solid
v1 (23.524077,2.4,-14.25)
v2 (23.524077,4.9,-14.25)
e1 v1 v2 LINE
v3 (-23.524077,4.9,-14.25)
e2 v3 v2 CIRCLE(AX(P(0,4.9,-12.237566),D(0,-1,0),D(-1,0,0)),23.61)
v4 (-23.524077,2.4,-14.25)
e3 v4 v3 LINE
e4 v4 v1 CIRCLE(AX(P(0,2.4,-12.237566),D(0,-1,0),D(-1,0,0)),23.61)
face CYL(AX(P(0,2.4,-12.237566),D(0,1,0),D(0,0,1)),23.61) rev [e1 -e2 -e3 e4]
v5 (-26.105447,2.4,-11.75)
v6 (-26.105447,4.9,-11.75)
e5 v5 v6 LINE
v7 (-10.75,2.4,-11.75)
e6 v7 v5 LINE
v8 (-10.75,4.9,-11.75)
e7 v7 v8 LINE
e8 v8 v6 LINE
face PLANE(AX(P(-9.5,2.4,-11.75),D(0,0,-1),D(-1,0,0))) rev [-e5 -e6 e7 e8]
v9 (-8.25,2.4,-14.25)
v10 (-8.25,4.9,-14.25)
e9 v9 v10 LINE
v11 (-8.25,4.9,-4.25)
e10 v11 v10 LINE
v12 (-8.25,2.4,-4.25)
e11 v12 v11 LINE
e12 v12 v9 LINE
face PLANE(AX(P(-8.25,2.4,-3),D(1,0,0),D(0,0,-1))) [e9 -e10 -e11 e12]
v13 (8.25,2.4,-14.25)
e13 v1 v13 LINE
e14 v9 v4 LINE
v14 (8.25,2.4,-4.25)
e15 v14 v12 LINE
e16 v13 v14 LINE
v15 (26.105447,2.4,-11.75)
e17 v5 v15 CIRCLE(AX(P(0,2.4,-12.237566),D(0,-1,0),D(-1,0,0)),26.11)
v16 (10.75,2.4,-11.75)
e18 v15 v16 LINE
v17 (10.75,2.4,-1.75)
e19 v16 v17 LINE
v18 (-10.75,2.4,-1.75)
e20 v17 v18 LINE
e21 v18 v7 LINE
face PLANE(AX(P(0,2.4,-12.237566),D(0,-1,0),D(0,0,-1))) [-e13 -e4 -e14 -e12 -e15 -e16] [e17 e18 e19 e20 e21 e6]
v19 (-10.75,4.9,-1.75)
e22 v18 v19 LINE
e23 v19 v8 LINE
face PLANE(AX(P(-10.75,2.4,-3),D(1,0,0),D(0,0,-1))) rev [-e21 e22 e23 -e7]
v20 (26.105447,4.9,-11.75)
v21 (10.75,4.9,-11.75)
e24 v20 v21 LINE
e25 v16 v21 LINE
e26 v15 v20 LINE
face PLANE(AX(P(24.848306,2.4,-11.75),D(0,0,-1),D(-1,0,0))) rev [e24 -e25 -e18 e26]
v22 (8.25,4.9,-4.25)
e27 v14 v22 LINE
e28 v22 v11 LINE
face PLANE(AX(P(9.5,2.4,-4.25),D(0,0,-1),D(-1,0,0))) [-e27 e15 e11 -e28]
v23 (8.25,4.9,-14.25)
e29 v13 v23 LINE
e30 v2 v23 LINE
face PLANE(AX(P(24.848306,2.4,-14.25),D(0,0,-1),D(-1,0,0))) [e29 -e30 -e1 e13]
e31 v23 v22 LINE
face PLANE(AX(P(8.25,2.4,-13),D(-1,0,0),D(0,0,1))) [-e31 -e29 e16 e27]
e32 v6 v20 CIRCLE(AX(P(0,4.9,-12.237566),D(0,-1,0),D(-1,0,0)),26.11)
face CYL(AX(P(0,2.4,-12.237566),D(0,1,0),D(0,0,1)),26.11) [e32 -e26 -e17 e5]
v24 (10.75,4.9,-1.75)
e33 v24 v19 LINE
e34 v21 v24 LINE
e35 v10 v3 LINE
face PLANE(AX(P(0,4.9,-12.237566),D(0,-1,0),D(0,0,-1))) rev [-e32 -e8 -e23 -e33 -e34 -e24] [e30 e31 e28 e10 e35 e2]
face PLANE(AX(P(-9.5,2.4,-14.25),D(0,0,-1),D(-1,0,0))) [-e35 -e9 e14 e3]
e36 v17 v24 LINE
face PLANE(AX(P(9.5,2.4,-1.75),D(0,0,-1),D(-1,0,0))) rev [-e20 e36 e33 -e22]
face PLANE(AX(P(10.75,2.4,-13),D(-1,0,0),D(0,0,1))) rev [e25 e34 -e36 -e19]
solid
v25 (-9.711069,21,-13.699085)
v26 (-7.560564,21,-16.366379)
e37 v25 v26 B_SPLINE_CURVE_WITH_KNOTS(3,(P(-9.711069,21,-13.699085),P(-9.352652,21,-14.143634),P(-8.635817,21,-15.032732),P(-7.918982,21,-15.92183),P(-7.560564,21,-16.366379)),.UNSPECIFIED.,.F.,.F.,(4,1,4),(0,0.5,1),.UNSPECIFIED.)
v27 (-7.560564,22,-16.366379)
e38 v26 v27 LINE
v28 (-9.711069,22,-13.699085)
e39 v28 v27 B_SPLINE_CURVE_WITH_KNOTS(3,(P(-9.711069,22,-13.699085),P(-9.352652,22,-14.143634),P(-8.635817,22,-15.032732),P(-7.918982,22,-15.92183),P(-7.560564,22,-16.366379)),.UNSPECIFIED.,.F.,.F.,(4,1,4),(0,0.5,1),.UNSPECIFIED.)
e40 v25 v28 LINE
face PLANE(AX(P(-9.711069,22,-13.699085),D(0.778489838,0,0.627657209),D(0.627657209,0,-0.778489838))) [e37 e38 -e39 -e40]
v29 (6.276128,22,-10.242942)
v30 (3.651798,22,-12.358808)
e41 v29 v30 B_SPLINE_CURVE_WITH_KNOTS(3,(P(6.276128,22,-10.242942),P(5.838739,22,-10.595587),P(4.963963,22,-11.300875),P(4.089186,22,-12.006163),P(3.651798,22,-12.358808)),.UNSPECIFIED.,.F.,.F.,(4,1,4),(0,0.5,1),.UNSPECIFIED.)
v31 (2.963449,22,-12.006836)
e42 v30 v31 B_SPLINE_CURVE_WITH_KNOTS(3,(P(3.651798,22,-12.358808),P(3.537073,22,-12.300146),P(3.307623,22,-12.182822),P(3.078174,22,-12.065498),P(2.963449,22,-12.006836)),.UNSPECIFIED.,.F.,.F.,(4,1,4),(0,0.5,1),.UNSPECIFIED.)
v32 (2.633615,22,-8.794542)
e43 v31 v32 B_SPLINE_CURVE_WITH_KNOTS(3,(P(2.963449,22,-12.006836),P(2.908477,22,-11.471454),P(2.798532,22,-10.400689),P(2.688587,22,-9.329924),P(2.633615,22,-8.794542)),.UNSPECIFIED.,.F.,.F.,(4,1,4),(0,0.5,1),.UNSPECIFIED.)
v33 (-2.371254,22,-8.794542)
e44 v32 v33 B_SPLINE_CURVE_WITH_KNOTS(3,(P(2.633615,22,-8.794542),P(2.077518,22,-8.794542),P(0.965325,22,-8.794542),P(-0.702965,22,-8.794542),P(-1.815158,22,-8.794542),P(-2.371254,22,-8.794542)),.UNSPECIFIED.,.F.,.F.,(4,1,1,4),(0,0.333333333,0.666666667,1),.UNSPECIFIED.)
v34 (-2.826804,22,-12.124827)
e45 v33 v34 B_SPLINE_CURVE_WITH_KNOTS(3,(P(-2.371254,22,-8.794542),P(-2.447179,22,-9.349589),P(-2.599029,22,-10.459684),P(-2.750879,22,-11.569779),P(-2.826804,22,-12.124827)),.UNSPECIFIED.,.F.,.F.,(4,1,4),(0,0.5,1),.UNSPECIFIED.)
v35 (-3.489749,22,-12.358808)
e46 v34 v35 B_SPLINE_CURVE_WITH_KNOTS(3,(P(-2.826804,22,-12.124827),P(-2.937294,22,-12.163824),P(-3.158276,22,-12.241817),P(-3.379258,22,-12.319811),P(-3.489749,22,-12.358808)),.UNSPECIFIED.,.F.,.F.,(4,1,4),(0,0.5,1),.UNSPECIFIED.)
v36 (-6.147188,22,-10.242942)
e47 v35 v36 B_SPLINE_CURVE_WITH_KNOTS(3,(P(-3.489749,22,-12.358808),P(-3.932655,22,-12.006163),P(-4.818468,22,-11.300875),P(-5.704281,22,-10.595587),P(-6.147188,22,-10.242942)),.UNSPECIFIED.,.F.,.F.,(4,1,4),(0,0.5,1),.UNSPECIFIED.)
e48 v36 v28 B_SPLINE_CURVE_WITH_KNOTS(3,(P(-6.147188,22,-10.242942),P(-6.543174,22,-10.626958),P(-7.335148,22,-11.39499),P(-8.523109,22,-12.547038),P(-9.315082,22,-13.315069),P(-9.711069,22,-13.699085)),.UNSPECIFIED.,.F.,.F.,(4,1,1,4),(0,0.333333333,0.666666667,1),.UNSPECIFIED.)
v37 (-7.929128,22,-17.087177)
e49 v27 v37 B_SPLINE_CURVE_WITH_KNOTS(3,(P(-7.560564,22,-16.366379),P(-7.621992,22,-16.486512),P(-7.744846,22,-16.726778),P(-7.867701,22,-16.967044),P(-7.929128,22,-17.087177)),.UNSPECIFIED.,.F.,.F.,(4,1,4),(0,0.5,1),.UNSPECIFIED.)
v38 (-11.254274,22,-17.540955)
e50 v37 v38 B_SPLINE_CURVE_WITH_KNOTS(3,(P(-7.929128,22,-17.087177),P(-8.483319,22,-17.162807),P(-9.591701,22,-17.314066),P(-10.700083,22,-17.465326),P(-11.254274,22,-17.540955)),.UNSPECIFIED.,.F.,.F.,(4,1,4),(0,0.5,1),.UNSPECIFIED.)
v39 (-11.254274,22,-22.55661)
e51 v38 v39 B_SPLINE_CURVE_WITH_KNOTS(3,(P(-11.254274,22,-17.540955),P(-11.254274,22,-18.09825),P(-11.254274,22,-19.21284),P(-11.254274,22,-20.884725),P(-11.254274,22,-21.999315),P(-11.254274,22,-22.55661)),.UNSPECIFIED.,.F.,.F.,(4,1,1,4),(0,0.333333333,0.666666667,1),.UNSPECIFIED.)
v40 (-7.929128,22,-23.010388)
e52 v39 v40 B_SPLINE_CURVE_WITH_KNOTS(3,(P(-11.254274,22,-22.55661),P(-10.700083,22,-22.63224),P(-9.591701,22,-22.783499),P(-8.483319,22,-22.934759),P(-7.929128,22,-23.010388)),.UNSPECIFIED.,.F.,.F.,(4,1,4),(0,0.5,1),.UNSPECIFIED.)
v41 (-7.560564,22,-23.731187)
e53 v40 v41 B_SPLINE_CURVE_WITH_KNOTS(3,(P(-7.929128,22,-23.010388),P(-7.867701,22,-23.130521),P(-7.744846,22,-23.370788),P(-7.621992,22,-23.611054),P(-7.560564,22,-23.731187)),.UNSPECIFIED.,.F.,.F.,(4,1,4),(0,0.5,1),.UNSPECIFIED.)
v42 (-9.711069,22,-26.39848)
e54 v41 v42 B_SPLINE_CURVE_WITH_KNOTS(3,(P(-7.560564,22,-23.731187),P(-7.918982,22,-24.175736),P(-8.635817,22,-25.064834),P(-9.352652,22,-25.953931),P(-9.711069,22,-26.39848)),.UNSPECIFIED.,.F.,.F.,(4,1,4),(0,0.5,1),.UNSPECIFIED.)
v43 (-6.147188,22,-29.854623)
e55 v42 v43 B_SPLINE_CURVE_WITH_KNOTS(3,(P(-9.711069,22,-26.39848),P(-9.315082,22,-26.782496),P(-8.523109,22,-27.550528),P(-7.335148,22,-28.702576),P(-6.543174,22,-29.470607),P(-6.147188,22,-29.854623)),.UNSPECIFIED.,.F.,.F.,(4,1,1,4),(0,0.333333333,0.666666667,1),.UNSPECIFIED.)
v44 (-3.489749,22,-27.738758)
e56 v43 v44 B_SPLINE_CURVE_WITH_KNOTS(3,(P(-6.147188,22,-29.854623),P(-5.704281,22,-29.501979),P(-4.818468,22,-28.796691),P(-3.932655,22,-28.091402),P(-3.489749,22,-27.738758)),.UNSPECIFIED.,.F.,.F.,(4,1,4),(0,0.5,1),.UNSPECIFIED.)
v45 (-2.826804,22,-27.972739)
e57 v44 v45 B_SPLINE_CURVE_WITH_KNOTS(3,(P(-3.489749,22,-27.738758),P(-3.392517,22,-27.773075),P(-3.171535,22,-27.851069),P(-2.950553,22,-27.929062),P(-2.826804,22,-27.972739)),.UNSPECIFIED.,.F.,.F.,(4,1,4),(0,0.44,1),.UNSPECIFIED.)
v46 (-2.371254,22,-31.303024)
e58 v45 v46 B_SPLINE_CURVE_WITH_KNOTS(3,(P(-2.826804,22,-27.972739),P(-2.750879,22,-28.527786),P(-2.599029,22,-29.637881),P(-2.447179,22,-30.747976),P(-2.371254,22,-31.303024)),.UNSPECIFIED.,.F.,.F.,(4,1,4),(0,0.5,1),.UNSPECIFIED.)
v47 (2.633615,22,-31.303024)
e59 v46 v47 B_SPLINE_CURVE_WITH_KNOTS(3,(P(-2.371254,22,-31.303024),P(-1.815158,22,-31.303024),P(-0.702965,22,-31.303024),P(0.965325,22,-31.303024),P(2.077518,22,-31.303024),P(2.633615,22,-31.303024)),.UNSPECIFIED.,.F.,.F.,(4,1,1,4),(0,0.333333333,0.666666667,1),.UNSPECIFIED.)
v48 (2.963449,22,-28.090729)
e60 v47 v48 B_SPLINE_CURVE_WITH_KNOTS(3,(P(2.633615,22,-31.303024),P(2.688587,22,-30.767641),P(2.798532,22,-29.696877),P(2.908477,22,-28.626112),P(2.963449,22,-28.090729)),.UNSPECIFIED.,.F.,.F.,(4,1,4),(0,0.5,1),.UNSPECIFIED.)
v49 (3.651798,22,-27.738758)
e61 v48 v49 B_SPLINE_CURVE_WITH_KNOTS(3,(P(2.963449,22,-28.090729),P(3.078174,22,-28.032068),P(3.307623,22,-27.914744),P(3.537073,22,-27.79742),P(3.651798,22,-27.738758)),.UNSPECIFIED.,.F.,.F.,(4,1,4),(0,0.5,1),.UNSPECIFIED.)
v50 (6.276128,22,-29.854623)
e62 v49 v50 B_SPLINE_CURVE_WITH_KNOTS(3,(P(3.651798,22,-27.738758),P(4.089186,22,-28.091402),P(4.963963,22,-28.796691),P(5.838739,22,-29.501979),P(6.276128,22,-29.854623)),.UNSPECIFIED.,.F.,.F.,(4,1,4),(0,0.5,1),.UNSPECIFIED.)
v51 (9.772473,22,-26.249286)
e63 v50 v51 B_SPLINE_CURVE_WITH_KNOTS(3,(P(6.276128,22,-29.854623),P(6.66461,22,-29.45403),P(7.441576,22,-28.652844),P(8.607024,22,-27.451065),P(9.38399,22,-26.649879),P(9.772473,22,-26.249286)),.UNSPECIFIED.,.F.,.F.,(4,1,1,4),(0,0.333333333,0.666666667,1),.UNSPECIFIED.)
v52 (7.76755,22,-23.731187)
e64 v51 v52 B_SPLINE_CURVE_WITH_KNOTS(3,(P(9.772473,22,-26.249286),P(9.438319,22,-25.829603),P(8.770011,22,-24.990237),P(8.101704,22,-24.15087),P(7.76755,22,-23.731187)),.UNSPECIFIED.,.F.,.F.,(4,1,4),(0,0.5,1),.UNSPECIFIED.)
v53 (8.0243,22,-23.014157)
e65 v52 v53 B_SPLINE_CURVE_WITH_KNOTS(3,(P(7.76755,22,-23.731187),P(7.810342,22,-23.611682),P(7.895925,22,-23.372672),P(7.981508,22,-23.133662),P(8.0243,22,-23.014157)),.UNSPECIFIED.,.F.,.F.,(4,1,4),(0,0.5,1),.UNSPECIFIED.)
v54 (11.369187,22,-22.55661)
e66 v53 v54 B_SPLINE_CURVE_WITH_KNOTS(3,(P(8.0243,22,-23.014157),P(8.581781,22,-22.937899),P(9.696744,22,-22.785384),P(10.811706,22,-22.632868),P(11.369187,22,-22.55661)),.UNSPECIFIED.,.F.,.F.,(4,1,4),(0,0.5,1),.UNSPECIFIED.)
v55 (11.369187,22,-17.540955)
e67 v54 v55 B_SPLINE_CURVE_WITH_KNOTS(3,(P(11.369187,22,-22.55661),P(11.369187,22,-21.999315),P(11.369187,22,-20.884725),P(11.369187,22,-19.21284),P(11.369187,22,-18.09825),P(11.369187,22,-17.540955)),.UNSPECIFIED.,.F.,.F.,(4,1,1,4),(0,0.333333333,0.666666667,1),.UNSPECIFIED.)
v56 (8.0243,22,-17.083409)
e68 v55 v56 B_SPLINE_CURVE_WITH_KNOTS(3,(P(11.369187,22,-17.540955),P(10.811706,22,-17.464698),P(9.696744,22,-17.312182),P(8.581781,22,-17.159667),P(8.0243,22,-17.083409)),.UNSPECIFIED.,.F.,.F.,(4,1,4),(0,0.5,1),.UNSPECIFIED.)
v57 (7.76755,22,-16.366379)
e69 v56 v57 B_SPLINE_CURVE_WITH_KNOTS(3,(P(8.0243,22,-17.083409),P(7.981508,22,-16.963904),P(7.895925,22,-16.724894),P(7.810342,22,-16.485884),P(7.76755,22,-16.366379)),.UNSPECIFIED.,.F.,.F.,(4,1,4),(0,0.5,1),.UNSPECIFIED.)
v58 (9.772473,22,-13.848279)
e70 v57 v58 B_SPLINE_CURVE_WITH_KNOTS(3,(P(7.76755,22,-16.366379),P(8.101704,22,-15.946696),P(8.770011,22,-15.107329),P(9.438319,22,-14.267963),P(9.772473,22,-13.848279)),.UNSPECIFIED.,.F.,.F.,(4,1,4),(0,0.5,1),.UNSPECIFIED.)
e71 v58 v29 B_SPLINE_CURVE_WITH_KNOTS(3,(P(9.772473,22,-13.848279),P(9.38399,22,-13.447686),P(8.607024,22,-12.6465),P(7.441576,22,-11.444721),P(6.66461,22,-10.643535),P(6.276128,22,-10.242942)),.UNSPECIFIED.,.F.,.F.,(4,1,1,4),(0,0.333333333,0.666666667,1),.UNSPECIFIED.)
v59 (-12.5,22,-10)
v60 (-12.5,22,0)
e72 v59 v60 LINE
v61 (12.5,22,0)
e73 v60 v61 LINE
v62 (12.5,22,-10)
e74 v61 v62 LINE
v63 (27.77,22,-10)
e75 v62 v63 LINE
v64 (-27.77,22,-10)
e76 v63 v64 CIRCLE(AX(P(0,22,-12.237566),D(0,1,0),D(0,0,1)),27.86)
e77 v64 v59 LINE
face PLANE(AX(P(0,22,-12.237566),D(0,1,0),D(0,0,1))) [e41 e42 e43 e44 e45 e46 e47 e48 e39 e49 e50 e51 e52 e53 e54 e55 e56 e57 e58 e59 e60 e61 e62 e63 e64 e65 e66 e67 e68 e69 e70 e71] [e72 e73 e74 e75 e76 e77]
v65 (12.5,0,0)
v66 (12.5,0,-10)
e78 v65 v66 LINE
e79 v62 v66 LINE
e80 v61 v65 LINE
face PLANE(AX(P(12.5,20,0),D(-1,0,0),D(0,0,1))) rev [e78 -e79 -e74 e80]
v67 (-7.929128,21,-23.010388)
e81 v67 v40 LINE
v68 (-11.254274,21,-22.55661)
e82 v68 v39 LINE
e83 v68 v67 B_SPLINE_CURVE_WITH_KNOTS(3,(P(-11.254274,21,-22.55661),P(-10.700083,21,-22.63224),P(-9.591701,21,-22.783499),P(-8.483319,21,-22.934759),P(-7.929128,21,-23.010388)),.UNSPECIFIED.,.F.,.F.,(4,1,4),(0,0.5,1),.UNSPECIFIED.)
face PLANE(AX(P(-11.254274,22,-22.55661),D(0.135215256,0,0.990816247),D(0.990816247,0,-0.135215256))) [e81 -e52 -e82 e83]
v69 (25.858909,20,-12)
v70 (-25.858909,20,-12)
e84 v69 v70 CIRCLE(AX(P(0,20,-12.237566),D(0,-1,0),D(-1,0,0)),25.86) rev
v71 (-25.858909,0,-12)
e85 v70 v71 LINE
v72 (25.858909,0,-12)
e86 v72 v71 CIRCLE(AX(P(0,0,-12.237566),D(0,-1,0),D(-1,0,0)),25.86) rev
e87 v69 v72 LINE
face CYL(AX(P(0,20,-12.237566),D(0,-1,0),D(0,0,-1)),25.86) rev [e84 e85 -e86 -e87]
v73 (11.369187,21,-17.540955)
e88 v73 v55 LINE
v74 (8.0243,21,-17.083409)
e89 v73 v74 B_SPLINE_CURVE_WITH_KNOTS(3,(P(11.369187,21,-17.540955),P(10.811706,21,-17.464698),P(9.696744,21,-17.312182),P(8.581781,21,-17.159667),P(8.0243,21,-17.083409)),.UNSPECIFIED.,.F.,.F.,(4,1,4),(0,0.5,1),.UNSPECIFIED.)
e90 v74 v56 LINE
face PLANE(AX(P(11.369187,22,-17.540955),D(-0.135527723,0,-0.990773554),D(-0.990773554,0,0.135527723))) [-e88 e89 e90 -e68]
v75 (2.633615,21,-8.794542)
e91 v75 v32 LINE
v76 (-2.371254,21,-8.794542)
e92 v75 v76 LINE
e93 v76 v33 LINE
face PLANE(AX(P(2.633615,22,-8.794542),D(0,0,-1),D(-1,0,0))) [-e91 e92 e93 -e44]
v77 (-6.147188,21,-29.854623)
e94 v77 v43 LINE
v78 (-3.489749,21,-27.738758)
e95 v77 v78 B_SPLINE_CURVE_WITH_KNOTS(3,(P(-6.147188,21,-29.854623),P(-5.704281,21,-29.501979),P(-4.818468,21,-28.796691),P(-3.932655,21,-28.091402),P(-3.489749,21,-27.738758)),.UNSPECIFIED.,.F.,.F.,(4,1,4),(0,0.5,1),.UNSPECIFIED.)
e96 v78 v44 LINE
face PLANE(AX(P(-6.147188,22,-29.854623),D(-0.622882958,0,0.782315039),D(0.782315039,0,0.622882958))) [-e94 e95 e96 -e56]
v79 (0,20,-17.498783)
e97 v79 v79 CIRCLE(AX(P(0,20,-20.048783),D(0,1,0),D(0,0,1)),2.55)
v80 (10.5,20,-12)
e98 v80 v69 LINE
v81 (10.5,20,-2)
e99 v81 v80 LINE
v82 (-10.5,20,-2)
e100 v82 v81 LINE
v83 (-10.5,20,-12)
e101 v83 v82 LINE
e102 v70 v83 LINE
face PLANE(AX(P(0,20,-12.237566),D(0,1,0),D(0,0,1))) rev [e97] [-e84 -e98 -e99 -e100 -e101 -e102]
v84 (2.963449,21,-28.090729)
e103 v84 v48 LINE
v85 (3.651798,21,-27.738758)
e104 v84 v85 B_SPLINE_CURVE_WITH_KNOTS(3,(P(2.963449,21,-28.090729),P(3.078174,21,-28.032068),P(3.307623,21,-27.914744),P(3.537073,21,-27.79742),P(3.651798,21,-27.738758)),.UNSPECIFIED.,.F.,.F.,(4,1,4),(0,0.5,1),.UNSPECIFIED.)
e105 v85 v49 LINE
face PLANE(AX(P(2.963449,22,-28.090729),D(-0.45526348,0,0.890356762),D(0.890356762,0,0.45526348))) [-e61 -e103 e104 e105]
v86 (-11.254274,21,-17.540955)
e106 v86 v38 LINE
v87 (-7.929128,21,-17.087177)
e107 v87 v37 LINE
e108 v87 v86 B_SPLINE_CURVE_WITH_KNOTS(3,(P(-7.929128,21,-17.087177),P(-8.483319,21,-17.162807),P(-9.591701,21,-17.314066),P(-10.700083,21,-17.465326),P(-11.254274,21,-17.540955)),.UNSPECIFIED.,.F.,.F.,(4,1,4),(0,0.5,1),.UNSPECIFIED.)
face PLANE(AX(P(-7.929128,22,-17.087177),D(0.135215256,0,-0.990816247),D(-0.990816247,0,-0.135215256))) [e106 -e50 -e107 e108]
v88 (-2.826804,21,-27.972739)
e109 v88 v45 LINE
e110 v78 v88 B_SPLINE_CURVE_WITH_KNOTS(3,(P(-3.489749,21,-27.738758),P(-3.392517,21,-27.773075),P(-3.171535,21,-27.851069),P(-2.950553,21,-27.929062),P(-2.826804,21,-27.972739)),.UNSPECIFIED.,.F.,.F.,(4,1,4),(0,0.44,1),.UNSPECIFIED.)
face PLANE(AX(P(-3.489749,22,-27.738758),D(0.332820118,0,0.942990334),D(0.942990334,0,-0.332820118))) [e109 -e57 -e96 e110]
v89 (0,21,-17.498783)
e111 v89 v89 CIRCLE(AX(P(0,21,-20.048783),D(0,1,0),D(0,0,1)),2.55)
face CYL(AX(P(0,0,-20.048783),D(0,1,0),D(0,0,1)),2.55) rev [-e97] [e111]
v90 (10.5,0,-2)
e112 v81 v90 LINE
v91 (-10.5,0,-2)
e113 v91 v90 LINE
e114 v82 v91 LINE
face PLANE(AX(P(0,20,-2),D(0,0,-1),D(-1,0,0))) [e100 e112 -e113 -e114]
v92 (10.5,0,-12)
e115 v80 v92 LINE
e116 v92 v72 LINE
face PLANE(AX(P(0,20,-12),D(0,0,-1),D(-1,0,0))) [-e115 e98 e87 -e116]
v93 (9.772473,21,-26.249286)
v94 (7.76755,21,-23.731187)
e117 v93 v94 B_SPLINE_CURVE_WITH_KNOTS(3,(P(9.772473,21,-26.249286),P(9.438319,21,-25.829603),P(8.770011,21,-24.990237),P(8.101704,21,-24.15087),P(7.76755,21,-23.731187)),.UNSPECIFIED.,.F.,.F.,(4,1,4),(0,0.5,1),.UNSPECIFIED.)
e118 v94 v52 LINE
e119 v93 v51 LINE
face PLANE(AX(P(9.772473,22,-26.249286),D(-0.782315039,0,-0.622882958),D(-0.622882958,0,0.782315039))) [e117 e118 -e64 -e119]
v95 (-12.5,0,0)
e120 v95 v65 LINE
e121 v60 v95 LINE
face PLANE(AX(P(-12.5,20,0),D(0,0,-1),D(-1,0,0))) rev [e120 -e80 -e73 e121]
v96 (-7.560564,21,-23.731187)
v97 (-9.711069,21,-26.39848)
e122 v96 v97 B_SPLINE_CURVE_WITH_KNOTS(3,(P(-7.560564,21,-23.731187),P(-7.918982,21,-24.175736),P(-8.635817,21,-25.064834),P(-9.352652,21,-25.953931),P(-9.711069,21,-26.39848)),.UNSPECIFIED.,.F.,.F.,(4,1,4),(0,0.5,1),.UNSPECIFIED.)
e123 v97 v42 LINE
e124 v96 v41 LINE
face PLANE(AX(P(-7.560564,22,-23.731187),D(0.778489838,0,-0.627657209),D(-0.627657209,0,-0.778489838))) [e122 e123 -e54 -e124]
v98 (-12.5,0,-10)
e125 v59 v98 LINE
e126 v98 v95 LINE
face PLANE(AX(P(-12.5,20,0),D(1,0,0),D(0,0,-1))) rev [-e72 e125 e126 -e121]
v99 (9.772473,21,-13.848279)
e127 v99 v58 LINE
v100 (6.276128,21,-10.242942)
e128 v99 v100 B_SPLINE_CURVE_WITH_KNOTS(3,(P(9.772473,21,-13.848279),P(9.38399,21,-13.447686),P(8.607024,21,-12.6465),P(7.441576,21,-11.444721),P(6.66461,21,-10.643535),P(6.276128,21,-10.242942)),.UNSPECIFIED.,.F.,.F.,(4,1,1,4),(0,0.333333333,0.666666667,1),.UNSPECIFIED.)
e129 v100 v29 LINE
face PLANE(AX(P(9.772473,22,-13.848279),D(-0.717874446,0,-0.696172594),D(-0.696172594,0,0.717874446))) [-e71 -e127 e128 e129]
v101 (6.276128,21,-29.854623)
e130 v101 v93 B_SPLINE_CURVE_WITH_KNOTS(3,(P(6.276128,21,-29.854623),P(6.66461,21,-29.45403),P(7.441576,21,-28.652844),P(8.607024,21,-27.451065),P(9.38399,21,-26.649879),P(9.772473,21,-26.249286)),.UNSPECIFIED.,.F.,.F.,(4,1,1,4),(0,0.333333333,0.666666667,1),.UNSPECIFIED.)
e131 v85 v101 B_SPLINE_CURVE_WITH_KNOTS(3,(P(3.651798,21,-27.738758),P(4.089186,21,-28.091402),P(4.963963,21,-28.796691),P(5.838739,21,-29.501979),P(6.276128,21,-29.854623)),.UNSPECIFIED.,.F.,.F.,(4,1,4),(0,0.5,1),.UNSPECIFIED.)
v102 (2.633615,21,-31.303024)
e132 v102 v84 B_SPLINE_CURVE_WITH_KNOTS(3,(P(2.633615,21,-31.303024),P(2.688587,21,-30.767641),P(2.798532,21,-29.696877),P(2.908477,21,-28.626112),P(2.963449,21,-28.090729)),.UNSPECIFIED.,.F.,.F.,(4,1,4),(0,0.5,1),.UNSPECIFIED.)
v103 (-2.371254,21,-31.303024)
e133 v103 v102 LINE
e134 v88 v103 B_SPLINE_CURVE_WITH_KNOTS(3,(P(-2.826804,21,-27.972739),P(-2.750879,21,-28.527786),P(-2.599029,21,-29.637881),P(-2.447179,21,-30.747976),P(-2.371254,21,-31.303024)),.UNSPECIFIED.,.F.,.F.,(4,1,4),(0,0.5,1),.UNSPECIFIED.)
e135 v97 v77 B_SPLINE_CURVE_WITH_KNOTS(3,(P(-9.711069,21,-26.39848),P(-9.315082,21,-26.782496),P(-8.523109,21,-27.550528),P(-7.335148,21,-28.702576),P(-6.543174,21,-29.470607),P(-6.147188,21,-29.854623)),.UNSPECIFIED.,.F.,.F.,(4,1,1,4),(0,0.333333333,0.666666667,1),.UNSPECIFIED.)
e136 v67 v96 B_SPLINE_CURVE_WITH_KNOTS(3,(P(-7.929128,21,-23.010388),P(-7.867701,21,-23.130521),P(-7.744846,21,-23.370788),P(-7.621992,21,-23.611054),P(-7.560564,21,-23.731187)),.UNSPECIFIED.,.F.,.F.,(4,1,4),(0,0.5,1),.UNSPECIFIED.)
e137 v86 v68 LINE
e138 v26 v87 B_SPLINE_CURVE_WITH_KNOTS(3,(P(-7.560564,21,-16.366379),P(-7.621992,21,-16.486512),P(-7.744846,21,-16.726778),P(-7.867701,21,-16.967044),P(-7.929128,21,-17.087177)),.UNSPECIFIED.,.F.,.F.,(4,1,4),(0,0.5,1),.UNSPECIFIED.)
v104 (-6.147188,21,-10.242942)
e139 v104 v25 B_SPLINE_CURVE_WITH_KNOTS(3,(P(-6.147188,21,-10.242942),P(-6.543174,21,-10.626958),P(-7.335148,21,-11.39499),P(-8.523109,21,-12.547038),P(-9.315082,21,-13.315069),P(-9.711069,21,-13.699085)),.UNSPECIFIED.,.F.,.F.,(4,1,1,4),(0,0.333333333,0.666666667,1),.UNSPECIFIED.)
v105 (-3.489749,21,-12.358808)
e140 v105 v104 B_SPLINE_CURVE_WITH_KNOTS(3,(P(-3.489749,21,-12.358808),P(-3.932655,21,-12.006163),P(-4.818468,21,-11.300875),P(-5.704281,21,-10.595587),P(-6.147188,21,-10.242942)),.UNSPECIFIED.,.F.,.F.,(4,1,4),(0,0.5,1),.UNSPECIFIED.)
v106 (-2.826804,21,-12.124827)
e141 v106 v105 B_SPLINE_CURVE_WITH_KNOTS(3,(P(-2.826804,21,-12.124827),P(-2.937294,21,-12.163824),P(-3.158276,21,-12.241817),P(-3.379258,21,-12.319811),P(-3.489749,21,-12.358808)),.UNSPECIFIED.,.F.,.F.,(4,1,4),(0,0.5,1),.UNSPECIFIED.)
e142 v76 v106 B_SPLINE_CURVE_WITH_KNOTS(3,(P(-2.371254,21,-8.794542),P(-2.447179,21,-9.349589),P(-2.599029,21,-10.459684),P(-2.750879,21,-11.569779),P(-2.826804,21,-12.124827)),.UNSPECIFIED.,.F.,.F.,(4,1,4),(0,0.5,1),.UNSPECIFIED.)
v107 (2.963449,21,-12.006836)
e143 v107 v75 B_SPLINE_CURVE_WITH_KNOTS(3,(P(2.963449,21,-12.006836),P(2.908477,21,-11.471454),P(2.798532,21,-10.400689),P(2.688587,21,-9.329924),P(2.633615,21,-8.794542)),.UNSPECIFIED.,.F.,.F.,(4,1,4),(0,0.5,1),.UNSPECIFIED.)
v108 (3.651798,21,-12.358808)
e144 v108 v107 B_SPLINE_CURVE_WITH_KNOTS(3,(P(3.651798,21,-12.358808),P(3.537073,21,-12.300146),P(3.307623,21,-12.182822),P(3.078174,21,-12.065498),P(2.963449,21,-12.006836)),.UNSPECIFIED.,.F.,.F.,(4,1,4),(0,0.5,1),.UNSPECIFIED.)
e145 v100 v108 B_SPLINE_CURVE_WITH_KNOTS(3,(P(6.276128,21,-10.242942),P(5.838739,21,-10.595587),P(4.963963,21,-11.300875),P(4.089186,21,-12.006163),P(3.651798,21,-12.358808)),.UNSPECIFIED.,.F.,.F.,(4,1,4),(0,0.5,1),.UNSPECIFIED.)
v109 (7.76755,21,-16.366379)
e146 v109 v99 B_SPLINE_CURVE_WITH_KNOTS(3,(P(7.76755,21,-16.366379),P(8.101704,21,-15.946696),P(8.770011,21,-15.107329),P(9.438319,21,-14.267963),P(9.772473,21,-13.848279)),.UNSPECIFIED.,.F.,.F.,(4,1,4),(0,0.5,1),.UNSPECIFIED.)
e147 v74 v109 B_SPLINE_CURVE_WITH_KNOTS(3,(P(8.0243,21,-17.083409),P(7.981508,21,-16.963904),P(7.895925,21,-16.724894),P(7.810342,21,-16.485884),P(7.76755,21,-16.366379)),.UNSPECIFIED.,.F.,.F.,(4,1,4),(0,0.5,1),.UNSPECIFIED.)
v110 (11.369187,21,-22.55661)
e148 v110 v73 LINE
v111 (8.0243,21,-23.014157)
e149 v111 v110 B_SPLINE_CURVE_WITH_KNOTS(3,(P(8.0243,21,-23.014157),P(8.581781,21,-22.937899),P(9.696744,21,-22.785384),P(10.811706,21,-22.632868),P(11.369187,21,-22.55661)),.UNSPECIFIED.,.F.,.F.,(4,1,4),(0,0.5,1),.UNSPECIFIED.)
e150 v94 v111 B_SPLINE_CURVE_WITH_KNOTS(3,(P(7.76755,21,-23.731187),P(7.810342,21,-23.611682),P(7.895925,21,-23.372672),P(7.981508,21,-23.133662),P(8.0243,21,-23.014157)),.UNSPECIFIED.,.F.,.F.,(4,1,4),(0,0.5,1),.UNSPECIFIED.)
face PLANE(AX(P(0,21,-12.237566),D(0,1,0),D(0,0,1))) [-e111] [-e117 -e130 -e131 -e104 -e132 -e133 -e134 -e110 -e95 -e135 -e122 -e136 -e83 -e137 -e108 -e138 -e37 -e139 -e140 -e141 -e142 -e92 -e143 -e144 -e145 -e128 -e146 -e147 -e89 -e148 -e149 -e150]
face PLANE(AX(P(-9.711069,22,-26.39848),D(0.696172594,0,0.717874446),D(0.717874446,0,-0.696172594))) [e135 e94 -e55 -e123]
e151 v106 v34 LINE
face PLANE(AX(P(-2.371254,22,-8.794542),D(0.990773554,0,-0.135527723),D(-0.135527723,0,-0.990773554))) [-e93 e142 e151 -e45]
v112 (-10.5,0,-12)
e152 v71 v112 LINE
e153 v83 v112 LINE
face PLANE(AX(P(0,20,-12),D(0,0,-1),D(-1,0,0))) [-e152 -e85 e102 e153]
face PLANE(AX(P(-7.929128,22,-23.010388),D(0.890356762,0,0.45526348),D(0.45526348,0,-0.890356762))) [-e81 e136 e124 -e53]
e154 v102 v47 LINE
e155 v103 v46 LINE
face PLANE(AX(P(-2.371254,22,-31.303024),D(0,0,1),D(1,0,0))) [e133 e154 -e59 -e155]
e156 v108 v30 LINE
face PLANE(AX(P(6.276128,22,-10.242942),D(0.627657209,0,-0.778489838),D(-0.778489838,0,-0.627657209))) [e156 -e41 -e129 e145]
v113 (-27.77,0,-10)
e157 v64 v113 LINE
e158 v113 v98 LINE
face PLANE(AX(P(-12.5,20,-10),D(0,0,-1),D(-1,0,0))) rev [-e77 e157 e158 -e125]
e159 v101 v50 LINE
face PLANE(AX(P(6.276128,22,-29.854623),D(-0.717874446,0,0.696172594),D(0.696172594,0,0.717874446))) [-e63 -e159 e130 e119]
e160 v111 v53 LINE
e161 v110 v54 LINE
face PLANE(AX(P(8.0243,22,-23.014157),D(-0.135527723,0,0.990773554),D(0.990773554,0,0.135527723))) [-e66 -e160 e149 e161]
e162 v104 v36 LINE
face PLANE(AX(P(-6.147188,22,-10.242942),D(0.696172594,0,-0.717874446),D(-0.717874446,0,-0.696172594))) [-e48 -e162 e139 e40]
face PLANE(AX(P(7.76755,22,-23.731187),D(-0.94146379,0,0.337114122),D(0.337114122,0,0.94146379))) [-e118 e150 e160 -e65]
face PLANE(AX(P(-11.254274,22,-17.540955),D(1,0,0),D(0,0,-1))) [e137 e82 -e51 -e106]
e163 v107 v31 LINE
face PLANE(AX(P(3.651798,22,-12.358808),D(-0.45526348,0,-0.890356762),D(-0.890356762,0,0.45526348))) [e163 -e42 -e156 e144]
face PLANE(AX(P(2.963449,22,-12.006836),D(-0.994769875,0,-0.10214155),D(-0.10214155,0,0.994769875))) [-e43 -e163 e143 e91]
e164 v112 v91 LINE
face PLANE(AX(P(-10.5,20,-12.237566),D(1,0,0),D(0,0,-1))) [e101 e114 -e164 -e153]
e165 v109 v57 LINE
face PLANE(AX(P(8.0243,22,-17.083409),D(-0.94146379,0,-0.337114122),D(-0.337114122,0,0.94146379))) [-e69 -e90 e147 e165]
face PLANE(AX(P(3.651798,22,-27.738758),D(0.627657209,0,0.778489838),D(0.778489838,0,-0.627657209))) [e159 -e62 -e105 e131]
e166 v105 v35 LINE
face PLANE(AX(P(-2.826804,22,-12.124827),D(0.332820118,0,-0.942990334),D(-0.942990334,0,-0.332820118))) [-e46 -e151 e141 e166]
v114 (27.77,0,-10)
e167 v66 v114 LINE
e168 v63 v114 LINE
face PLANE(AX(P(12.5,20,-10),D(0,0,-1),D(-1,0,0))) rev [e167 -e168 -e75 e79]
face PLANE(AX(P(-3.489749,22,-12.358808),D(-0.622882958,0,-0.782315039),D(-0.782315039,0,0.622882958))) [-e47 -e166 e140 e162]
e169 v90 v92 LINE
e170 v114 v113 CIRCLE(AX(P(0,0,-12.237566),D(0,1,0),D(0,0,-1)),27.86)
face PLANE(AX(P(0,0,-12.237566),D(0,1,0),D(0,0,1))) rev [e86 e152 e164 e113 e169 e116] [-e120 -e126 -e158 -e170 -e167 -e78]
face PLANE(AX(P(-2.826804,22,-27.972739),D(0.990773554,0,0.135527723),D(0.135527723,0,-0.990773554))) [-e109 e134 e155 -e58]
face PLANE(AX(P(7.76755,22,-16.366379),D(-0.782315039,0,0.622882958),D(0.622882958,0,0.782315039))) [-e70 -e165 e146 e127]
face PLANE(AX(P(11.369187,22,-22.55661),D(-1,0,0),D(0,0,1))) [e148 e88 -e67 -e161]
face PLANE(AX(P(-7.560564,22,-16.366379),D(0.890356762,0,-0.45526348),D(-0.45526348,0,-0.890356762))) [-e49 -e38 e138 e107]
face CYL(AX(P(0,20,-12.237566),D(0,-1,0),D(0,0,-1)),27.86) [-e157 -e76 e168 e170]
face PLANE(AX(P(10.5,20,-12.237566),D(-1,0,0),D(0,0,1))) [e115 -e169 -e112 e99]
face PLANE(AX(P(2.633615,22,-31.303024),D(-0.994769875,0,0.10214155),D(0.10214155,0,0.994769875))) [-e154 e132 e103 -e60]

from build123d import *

# Parameters (mm, degrees)
EXTRUIR_L_MINA1_DEPTH   = 20
SALIENTE_EXTRUIR1_DEPTH = 2
EXTRUIR_L_MINA2_DEPTH   = 2.5
ENVOLVER1_START         = -1
ENVOLVER1_DEPTH         = 1
CROQUIS13_R             = 2.55
CORTAR_EXTRUIR1_DEPTH   = 54.553658795


# Read off the part's stored shape, not the designer's step: Envolver1
with BuildPart() as part:
    # Croquis1 → Extruir-Lámina1 (new body)
    with BuildSketch(Plane(origin=(0, 0, 0), x_dir=(1, 0, 0), z_dir=(0, 1, 0))):
        with BuildLine():
            Line((-27.77, 10), (-12.5, 10))
            Line((-12.5, 10), (-12.5, 0))
            Line((-12.5, 0), (12.5, 0))
            Line((12.5, 0), (12.5, 10))
            Line((12.5, 10), (27.77, 10))
            ThreePointArc((27.77, 10), (0, 40.097565641), (-27.77, 10))
        make_face()
        with BuildLine():
            Line((-25.858908766, 12), (-10.5, 12))
            Line((-10.5, 12), (-10.5, 2))
            Line((-10.5, 2), (10.5, 2))
            Line((10.5, 2), (10.5, 12))
            Line((10.5, 12), (25.858908766, 12))
            ThreePointArc((25.858908766, 12), (0, 38.097565641), (-25.858908766, 12))
        make_face(mode=Mode.SUBTRACT)
    extrude(amount=EXTRUIR_L_MINA1_DEPTH)

    # Croquis2 → Saliente-Extruir1 (add)
    with BuildSketch(Plane(origin=(0, 20, 0), x_dir=(1, 0, 0), z_dir=(0, 1, 0))):
        with BuildLine():
            Line((12.5, 10), (27.77, 10))
            ThreePointArc((27.77, 10), (0, 40.097565641), (-27.77, 10))
            Line((-27.77, 10), (-12.5, 10))
            Line((-12.5, 10), (-12.5, 0))
            Line((-12.5, 0), (12.5, 0))
            Line((12.5, 0), (12.5, 10))
        make_face()
    extrude(amount=SALIENTE_EXTRUIR1_DEPTH)

    # Envolver1 outline → Envolver1 (cut)
    with BuildSketch(Plane(origin=(0, 22, 0), x_dir=(1, 0, 0), z_dir=(0, 1, 0)).offset(ENVOLVER1_START)):
        Polygon((-3.489748997, 27.738758035), (-6.147187537, 29.854623251), (-9.711069089, 26.398480357), (-7.560564468, 23.731186854), (-7.929128313, 23.010388183), (-11.254274193, 22.556610346), (-11.254274193, 17.540955296), (-7.929128313, 17.087177459), (-7.560564468, 16.366378787), (-9.711069089, 13.699085285), (-6.147187537, 10.242942391), (-3.489748997, 12.358807607), (-2.826803524, 12.124826852), (-2.371254467, 8.794541744), (2.633615094, 8.794541744), (2.963448904, 12.006836247), (3.651797726, 12.358807607), (6.27612761, 10.242942391), (9.772472758, 13.848279425), (7.767550058, 16.366378787), (8.024300184, 17.08340881), (11.369187461, 17.540955296), (11.369187461, 22.556610346), (8.024300184, 23.014156831), (7.767550058, 23.731186854), (9.772472758, 26.249286217), (6.27612761, 29.854623251), (3.651797726, 27.738758035), (2.963448904, 28.090729394), (2.633615094, 31.303023897), (-2.371254467, 31.303023897), (-2.826803524, 27.97273879), align=None)
    extrude(amount=ENVOLVER1_DEPTH, mode=Mode.SUBTRACT)

    # Croquis13 → Cortar-Extruir1 (cut, through all)
    with BuildSketch(Plane(origin=(0, 22, 0), x_dir=(1, 0, 0), z_dir=(0, 1, 0))):
        with Locations(Location((0, 20.048782821, 0), (0, 0, 270))):
            Circle(CROQUIS13_R)
    extrude(amount=-CORTAR_EXTRUIR1_DEPTH, mode=Mode.SUBTRACT)


with BuildPart() as body_2:
    # Croquis9 → Extruir-Lámina2 (new body)
    with BuildSketch(Plane(origin=(0, 4.9, 0), x_dir=(-1, 0, 0), z_dir=(0, -1, 0))):
        with BuildLine():
            Line((-26.105447319, 11.75), (-10.75, 11.75))
            Line((-10.75, 11.75), (-10.75, 1.75))
            Line((-10.75, 1.75), (10.75, 1.75))
            Line((10.75, 1.75), (10.75, 11.75))
            Line((10.75, 11.75), (26.105447319, 11.75))
            ThreePointArc((26.105447319, 11.75), (0, 38.347565641), (-26.105447319, 11.75))
        make_face()
        with BuildLine():
            Line((-23.524077197, 14.25), (-8.25, 14.25))
            Line((-8.25, 14.25), (-8.25, 4.25))
            Line((-8.25, 4.25), (8.25, 4.25))
            Line((8.25, 4.25), (8.25, 14.25))
            Line((8.25, 14.25), (23.524077197, 14.25))
            ThreePointArc((23.524077197, 14.25), (0, 35.847565641), (-23.524077197, 14.25))
        make_face(mode=Mode.SUBTRACT)
    extrude(amount=EXTRUIR_L_MINA2_DEPTH)


solid = Compound([part.part, body_2.part])
